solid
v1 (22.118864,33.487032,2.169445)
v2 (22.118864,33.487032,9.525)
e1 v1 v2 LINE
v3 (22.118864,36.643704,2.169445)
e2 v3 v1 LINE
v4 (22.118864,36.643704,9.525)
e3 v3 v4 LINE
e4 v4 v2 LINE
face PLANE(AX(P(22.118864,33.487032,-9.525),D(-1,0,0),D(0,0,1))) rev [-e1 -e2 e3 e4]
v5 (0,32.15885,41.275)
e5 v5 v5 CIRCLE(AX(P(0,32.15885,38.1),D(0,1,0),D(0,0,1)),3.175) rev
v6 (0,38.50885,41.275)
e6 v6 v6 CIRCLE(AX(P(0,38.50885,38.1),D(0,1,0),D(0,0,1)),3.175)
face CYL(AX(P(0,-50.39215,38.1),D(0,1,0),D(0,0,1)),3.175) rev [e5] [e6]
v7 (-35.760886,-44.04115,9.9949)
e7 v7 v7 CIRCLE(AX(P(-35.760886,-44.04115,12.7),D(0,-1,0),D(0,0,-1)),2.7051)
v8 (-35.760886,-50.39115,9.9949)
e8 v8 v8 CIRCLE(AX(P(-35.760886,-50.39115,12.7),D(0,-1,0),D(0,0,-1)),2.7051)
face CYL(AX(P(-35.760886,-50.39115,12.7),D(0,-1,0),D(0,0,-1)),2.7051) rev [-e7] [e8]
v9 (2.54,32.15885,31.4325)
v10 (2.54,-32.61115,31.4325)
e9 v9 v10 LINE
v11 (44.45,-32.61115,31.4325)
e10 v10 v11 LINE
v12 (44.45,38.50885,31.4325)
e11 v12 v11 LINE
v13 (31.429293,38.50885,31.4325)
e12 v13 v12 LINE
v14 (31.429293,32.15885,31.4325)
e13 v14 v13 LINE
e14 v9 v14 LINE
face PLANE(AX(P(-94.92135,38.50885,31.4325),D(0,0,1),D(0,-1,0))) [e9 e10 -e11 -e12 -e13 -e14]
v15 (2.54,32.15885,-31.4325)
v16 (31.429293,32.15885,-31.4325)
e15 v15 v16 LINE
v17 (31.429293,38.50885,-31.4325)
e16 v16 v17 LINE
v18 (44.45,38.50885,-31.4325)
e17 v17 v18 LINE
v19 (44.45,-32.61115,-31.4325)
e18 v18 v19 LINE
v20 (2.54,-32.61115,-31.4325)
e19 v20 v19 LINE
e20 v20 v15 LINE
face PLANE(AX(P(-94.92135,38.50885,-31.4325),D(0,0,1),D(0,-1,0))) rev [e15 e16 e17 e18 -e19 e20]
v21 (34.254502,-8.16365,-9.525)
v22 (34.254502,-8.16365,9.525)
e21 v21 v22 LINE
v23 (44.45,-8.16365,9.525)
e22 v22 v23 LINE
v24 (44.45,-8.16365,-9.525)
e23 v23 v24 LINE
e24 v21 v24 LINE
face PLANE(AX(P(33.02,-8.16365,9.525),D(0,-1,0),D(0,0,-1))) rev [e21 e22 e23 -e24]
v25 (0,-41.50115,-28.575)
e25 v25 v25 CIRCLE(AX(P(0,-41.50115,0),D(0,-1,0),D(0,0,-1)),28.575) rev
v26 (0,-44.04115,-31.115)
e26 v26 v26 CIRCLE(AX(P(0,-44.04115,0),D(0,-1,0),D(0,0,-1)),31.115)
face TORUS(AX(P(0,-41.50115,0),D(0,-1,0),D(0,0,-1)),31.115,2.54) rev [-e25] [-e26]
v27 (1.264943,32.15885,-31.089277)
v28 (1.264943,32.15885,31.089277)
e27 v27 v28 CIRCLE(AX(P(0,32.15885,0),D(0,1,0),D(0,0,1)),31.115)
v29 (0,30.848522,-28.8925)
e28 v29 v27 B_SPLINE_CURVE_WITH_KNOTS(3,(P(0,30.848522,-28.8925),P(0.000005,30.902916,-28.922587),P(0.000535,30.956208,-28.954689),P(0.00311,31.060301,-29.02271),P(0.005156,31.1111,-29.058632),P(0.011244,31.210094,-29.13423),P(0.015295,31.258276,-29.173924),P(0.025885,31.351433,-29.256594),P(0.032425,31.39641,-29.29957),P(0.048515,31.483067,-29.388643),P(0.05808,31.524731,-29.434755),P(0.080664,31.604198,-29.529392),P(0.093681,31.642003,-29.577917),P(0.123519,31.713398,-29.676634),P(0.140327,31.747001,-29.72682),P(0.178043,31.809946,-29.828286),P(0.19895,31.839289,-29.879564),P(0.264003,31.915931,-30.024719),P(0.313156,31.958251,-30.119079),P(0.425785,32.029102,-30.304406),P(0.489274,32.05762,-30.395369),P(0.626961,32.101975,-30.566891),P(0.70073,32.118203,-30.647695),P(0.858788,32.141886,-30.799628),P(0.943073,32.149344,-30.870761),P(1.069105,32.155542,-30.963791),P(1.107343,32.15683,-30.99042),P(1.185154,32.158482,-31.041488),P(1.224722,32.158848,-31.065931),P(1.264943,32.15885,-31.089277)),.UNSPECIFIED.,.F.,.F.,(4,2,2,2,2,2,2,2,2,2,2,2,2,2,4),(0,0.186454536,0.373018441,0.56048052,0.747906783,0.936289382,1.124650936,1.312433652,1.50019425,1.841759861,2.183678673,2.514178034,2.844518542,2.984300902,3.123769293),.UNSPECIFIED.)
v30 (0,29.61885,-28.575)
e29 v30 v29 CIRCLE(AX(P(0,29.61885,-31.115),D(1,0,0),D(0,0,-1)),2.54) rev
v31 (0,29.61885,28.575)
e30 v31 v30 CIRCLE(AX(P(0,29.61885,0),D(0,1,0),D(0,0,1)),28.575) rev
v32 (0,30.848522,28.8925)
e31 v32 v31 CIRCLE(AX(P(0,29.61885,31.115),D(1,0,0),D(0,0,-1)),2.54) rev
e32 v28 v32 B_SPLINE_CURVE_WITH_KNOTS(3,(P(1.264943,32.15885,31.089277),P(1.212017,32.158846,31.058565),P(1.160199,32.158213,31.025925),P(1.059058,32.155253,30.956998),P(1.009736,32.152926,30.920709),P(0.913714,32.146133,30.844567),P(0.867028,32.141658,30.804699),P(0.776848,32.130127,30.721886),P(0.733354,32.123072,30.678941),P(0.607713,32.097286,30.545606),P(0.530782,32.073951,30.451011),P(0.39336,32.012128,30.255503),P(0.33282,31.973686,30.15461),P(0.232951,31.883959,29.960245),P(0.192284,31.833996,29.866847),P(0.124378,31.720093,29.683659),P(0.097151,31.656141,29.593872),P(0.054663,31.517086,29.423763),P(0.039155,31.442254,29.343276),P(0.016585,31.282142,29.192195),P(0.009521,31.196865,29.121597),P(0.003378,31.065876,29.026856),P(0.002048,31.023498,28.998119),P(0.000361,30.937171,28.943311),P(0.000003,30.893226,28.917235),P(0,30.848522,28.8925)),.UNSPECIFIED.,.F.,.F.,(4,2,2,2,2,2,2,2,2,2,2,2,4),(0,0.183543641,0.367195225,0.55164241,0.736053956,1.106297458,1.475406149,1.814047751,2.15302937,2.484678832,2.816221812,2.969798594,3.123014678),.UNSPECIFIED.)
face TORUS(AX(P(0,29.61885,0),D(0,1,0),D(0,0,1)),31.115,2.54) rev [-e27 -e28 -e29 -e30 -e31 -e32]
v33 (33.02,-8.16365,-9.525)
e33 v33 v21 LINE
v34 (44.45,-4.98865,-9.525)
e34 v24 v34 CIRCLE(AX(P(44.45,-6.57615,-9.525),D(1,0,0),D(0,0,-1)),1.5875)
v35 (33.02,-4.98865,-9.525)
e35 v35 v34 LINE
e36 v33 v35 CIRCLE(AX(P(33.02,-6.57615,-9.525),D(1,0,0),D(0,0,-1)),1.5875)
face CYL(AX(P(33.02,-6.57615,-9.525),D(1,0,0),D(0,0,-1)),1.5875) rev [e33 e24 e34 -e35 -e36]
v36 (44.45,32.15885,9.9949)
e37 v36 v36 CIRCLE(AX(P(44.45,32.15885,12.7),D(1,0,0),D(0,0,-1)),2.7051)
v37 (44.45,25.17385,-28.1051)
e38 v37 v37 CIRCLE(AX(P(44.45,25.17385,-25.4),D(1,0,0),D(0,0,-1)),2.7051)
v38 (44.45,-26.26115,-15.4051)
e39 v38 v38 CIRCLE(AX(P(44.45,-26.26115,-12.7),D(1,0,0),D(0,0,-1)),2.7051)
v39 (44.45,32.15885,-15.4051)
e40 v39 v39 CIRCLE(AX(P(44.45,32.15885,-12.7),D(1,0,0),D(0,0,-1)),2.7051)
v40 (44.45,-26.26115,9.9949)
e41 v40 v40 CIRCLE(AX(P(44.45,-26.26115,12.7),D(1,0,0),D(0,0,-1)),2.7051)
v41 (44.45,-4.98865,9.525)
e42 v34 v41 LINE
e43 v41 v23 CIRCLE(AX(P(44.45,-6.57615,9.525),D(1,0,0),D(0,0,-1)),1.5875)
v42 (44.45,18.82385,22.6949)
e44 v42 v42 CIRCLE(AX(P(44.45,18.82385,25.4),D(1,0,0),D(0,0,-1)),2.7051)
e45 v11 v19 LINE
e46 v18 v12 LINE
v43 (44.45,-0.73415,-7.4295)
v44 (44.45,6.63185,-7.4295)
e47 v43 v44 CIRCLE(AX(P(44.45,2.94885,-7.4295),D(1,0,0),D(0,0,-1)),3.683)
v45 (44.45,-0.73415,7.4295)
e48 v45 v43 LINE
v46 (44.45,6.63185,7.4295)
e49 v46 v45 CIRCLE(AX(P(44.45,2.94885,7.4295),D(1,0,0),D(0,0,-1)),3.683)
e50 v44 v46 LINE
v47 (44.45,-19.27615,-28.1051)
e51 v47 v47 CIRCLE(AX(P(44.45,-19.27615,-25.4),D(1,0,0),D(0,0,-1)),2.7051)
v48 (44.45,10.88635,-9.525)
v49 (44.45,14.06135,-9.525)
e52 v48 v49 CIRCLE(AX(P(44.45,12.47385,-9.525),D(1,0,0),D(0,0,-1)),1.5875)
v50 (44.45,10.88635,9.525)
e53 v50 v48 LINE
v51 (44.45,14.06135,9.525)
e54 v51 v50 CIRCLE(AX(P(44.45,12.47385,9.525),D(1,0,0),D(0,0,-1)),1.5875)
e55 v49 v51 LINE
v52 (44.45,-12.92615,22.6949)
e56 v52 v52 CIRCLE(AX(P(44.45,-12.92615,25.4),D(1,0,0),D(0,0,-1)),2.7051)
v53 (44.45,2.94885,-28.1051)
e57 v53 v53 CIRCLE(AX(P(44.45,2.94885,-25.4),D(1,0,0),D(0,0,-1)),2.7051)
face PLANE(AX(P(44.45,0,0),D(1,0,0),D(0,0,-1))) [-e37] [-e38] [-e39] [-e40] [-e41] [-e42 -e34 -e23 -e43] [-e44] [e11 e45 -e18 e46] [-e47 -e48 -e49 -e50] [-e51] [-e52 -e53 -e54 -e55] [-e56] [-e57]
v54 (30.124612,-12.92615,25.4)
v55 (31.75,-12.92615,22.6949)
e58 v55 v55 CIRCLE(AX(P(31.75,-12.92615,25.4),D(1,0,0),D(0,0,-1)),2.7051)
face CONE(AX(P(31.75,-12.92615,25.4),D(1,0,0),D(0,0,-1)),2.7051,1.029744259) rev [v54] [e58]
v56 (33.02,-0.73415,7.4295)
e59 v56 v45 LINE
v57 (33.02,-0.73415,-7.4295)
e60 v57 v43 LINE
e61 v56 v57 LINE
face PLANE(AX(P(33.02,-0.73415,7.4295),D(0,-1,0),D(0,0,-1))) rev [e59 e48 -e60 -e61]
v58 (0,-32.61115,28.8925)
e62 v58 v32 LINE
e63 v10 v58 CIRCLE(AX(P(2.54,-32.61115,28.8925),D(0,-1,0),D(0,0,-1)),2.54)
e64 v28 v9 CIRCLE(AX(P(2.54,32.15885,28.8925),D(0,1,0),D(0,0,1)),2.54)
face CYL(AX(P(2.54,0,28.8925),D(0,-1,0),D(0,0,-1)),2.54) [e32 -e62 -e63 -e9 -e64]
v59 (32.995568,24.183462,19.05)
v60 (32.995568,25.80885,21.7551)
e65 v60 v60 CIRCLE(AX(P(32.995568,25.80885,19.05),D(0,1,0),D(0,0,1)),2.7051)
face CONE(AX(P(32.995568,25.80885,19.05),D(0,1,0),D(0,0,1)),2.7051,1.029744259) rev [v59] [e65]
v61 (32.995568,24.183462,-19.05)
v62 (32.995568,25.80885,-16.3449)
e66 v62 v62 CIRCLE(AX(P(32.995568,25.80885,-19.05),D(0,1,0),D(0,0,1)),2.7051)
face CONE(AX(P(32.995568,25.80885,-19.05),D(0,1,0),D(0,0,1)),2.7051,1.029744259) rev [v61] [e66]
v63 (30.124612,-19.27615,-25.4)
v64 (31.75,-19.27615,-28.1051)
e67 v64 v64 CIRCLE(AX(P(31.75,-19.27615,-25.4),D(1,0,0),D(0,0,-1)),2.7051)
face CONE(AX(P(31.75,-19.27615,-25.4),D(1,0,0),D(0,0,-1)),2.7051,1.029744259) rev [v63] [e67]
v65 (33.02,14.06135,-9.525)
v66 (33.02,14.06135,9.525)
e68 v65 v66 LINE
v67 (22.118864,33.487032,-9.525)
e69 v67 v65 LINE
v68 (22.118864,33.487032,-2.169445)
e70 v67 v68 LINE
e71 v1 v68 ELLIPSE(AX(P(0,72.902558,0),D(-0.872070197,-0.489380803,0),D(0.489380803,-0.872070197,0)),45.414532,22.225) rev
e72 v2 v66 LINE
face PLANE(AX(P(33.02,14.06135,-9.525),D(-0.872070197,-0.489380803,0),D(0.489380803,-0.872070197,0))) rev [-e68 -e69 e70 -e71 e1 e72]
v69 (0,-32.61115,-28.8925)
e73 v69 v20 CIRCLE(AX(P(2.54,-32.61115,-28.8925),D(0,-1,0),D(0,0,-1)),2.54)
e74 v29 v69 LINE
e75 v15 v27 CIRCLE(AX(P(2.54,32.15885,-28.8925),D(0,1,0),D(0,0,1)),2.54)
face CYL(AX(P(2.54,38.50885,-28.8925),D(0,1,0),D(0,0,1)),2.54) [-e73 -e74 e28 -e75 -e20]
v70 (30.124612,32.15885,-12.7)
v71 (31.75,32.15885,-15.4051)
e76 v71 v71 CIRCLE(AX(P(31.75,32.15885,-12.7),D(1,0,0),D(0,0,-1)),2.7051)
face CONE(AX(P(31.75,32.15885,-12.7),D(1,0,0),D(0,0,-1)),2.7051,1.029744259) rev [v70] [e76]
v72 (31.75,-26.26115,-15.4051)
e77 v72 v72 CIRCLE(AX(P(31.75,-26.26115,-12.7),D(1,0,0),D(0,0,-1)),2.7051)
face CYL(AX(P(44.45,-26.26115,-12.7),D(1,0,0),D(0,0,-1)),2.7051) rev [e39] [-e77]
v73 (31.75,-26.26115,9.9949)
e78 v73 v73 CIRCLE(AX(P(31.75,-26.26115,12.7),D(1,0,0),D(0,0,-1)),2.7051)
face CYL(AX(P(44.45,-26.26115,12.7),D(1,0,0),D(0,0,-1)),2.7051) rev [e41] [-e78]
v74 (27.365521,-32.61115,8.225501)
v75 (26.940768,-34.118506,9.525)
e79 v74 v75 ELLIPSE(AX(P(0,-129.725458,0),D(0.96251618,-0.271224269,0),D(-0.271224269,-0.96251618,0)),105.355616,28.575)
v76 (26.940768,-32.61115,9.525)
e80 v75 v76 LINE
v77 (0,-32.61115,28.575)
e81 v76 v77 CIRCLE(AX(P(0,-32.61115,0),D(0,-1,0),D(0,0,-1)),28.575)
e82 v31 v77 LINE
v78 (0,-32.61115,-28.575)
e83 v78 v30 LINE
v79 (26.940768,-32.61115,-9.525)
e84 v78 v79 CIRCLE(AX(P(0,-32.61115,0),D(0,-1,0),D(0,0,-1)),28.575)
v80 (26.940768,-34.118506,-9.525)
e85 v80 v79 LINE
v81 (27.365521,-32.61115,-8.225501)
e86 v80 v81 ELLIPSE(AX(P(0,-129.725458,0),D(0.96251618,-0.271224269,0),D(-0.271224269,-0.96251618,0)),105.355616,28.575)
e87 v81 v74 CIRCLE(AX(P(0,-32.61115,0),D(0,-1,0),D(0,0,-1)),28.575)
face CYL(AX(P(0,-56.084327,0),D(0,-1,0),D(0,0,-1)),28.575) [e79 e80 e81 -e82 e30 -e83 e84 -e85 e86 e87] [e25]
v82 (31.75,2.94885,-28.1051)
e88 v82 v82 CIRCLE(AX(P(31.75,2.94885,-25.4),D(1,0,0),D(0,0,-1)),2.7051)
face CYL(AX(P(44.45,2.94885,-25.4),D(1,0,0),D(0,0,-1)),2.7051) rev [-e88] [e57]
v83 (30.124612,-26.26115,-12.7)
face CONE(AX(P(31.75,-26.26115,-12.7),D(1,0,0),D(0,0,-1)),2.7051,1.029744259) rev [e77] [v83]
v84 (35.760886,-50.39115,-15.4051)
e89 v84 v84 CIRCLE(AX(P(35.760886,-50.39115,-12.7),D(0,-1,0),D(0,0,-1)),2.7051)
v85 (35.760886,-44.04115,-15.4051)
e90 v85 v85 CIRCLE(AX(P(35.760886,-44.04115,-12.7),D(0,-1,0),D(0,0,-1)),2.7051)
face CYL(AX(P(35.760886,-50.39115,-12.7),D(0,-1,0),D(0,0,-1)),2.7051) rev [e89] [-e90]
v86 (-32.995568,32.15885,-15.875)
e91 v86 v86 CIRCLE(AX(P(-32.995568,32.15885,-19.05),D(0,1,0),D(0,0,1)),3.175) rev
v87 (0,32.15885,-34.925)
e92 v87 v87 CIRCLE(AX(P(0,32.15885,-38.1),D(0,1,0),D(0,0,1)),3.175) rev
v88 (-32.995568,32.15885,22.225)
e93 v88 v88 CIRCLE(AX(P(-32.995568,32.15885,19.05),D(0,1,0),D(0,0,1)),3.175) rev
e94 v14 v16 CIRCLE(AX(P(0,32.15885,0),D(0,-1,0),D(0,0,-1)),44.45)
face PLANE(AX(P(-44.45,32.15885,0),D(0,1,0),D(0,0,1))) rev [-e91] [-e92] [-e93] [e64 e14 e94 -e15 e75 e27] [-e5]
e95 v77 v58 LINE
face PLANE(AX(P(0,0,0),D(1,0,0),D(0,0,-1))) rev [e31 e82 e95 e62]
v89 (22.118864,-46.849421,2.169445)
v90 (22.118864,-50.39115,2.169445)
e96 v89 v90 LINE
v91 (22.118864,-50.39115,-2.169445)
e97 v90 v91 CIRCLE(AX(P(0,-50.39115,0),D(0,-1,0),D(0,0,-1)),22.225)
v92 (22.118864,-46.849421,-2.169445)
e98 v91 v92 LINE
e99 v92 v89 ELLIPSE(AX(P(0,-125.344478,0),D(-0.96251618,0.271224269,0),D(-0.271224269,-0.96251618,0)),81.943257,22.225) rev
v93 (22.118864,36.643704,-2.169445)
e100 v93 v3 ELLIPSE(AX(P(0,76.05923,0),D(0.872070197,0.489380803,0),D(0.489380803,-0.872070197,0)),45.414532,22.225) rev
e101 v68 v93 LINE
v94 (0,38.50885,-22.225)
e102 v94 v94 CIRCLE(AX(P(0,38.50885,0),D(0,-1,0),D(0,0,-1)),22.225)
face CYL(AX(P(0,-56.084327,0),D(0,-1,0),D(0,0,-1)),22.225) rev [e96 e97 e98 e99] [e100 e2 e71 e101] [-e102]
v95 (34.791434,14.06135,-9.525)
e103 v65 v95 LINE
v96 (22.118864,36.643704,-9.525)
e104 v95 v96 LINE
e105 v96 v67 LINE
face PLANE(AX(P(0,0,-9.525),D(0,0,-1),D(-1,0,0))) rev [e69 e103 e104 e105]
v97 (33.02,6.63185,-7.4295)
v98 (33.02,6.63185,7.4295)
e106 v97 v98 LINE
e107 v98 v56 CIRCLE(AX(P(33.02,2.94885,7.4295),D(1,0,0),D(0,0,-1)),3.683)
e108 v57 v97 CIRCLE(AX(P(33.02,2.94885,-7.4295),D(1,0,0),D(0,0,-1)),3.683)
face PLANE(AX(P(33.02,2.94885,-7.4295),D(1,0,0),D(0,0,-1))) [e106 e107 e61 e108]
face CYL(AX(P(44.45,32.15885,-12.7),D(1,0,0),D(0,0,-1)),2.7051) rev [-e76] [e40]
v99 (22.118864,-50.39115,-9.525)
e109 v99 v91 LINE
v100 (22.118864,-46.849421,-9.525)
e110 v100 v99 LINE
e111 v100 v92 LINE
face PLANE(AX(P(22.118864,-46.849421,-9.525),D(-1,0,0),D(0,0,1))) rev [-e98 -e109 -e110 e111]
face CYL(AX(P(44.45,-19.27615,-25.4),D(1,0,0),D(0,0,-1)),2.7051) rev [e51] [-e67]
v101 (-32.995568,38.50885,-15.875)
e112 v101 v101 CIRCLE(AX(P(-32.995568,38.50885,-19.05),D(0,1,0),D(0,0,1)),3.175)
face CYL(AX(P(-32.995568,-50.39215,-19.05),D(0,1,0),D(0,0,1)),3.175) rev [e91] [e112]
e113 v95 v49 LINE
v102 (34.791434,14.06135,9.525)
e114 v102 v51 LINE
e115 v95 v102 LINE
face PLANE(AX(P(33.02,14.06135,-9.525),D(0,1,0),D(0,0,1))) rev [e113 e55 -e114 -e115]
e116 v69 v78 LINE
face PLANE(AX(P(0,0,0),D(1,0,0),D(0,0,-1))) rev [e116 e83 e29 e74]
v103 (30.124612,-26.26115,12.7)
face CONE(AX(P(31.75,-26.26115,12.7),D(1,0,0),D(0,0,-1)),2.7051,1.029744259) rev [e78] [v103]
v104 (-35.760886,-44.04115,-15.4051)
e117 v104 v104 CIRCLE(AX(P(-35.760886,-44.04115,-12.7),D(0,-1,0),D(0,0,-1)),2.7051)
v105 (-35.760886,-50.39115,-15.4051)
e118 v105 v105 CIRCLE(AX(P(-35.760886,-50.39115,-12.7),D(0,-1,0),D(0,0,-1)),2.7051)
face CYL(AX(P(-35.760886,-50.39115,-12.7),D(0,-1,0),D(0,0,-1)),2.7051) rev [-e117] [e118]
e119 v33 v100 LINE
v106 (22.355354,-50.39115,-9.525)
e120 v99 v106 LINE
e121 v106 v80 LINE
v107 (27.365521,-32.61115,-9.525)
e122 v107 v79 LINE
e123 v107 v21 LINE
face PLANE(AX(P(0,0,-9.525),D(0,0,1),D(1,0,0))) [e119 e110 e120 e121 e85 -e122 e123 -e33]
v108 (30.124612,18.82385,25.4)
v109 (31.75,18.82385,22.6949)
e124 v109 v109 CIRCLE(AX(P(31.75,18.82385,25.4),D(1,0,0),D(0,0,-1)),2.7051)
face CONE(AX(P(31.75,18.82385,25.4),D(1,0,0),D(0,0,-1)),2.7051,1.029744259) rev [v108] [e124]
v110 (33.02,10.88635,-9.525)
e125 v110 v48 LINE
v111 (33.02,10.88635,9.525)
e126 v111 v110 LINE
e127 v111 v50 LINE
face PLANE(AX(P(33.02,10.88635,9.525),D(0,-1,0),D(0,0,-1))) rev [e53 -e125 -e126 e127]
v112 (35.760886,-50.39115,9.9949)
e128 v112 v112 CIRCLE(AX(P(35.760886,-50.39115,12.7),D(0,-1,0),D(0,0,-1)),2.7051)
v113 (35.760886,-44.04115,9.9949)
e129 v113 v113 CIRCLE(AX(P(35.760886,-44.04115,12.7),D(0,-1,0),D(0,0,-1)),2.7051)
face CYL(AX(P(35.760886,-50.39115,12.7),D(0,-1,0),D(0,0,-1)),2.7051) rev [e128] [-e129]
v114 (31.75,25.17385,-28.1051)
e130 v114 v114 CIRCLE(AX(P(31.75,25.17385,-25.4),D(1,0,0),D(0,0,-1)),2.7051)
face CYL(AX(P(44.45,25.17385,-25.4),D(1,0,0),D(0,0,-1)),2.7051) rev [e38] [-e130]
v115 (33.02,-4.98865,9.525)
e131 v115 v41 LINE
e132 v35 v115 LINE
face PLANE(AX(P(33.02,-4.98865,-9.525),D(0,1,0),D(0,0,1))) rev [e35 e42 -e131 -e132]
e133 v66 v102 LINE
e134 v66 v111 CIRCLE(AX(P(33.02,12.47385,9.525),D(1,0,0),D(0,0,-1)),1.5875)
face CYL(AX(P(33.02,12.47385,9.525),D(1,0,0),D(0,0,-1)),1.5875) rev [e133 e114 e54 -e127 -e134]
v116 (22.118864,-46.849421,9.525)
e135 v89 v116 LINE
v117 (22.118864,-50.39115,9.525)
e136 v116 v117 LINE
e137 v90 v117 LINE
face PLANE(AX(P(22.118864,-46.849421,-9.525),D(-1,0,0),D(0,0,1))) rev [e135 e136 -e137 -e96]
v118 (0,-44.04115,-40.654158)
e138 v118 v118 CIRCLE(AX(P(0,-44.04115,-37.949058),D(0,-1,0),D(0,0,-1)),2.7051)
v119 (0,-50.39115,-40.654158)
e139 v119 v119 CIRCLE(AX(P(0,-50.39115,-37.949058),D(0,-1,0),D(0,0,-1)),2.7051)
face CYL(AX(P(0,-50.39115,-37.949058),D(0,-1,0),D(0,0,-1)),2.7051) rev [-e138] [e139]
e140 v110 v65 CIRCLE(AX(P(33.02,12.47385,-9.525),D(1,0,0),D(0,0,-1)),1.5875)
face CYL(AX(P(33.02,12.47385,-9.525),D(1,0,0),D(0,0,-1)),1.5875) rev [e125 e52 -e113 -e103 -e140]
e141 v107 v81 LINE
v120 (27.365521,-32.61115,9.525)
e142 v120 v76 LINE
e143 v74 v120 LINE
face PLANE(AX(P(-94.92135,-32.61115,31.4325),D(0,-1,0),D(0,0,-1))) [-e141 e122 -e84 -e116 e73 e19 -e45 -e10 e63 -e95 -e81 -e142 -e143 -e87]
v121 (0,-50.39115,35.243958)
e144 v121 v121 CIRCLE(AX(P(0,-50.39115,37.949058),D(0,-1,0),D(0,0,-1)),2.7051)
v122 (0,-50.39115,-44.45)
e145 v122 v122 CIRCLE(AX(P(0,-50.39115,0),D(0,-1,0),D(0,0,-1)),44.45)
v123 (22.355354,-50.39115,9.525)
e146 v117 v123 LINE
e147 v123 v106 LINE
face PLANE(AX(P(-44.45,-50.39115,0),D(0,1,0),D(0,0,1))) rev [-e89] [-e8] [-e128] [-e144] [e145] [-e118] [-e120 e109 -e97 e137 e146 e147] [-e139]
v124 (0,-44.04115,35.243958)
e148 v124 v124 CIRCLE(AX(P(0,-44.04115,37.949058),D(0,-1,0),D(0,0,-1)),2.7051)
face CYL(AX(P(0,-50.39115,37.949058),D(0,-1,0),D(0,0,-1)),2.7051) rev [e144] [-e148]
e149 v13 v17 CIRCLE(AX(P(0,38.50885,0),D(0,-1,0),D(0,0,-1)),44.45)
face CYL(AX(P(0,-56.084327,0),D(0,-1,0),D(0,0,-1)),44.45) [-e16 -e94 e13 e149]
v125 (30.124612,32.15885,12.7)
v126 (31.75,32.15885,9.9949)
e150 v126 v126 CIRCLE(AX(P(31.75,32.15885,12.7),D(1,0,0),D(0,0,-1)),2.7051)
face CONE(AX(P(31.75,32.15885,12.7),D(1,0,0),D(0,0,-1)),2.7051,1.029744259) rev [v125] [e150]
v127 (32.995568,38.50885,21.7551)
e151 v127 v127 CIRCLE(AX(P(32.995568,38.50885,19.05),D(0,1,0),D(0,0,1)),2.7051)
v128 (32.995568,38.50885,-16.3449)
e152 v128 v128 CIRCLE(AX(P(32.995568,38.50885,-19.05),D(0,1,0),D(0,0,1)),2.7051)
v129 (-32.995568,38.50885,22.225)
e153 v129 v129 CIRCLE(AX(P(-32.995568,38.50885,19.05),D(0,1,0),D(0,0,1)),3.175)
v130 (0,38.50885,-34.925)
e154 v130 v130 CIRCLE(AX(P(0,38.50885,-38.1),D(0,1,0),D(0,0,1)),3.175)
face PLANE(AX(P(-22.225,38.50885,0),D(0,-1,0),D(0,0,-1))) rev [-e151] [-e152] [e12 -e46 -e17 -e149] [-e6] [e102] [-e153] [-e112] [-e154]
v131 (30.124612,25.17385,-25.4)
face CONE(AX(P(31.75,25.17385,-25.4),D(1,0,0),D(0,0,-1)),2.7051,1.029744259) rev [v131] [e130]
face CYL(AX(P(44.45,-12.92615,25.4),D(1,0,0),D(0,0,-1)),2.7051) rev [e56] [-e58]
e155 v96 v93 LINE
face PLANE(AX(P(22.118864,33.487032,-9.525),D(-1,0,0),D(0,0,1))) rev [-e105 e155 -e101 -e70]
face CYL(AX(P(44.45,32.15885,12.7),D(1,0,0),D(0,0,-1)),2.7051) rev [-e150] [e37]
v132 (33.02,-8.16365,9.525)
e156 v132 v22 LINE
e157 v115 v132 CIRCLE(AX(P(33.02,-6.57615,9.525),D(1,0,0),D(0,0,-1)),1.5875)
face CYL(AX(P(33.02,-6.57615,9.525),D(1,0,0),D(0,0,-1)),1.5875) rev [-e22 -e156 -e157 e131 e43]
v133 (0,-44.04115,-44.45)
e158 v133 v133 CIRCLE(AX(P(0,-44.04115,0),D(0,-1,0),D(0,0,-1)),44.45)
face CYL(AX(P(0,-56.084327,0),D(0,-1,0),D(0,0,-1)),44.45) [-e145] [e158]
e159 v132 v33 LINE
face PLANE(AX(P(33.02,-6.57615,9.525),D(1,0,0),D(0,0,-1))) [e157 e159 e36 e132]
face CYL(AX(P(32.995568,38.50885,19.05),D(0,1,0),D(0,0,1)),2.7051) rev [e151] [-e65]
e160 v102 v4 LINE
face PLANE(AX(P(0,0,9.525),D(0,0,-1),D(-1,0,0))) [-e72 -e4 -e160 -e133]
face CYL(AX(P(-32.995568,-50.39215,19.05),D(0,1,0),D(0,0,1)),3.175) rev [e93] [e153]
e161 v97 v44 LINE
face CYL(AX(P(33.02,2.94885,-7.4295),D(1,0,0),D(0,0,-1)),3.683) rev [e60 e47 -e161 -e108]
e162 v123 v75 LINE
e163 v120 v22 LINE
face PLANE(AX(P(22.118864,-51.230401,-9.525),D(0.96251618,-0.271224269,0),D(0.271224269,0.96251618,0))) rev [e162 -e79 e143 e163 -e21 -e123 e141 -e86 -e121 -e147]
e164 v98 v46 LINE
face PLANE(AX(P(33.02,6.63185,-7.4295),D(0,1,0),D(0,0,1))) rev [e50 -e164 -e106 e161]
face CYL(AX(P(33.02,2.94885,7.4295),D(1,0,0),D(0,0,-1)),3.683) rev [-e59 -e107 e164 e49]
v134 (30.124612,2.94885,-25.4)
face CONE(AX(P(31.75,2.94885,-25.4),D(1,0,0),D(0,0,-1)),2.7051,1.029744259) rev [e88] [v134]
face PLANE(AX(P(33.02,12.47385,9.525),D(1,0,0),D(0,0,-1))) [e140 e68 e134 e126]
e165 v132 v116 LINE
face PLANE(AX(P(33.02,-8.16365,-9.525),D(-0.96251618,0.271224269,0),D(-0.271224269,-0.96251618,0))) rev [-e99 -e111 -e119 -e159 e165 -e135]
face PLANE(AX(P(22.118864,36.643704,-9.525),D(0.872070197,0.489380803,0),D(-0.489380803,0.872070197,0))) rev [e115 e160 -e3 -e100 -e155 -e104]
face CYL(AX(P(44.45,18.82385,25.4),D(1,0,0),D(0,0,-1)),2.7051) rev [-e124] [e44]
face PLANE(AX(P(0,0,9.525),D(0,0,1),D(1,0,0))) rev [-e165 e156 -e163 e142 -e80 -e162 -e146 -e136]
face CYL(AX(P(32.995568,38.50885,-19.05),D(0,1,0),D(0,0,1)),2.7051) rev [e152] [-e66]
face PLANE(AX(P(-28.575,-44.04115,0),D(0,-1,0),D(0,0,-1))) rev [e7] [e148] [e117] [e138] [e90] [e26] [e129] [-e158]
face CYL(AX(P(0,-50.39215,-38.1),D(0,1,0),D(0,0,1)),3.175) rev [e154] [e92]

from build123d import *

# Parameters (mm, degrees)
CUT_EXTRUDE1_REACH          = 110.88
SKETCH5_R                   = 3.175
SKETCH3_W                   = 62.865
SKETCH3_H                   = 71.12
BOSS_EXTRUDE3_DEPTH         = 44.45
SKETCH8_R                   = 22.225
CUT_EXTRUDE3_DEPTH          = 109.879819067
FILLET1_R                   = 2.54
FILLET2_R                   = 2.54
F_1_4_28_TAPPED_HOLE1_D     = 5.4102
F_1_4_28_TAPPED_HOLE1_DEPTH = 12.7
F_1_4_28_TAPPED_HOLE1_TIP   = 1.625388061
F_1_4_28_TAPPED_HOLE7_D     = 5.4102
F_1_4_28_TAPPED_HOLE7_DEPTH = 6.35
F_1_4_28_TAPPED_HOLE8_D     = 5.4102
F_1_4_28_TAPPED_HOLE8_DEPTH = 12.7
F_1_4_28_TAPPED_HOLE8_TIP   = 1.625388061
CUT_EXTRUDE4_DEPTH          = 11.43
CUT_EXTRUDE6_DEPTH          = 9.525
CUT_EXTRUDE6_DEPTH_BACK     = 9.525
F_1_4_28_TAPPED_HOLE9_D     = 5.4102
F_1_4_28_TAPPED_HOLE9_DEPTH = 12.7
F_1_4_28_TAPPED_HOLE9_TIP   = 1.625388061


with BuildPart() as part:
    # Sketch2 → Revolve1 (revolve)
    with BuildSketch(Plane.XY, mode=Mode.PRIVATE) as revolve1_sk:
        Polygon((-22.225, 38.508849789), (-44.45, 38.508849789), (-44.45, 32.158849789), (-28.575, 32.158849789), (-28.575, -44.041150211), (-44.45, -44.041150211), (-44.45, -50.391150211), (-22.225, -50.391150211), (-22.225, 26.465672677), align=None)
    revolve(revolve1_sk.sketch.rotate(Axis((0, -56.084327323, 0), (0, 1, 0)), 270), axis=Axis((0, -56.084327323, 0), (0, 1, 0)))

    # Sketch5 → Cut-Extrude1 (cut, up to next)
    with BuildSketch(Plane(origin=(0, 38.508849789, 0), x_dir=(1, 0, 0), z_dir=(0, 1, 0)), mode=Mode.PRIVATE) as cut_extrude1_sk1:
        with Locations(Location((0, 38.1, 0), (0, 0, 270))):
            Circle(SKETCH5_R)
    cut_extrude1_tool1 = extrude(cut_extrude1_sk1.sketch, amount=-CUT_EXTRUDE1_REACH, mode=Mode.PRIVATE) & part.part
    # Sketch5 → Cut-Extrude1 (cut, up to next)
    with BuildSketch(Plane(origin=(0, 38.508849789, 0), x_dir=(1, 0, 0), z_dir=(0, 1, 0)), mode=Mode.PRIVATE) as cut_extrude1_sk2:
        with Locations(Location((32.995567884, 19.05, 0), (0, 0, 270))):
            Circle(SKETCH5_R)
    cut_extrude1_tool2 = extrude(cut_extrude1_sk2.sketch, amount=-CUT_EXTRUDE1_REACH, mode=Mode.PRIVATE) & part.part
    # Sketch5 → Cut-Extrude1 (cut, up to next)
    with BuildSketch(Plane(origin=(0, 38.508849789, 0), x_dir=(1, 0, 0), z_dir=(0, 1, 0)), mode=Mode.PRIVATE) as cut_extrude1_sk3:
        with Locations(Location((32.995567884, -19.05, 0), (0, 0, 270))):
            Circle(SKETCH5_R)
    cut_extrude1_tool3 = extrude(cut_extrude1_sk3.sketch, amount=-CUT_EXTRUDE1_REACH, mode=Mode.PRIVATE) & part.part
    # Sketch5 → Cut-Extrude1 (cut, up to next)
    with BuildSketch(Plane(origin=(0, 38.508849789, 0), x_dir=(1, 0, 0), z_dir=(0, 1, 0)), mode=Mode.PRIVATE) as cut_extrude1_sk4:
        with Locations(Location((0, -38.1, 0), (0, 0, 270))):
            Circle(SKETCH5_R)
    cut_extrude1_tool4 = extrude(cut_extrude1_sk4.sketch, amount=-CUT_EXTRUDE1_REACH, mode=Mode.PRIVATE) & part.part
    # Sketch5 → Cut-Extrude1 (cut, up to next)
    with BuildSketch(Plane(origin=(0, 38.508849789, 0), x_dir=(1, 0, 0), z_dir=(0, 1, 0)), mode=Mode.PRIVATE) as cut_extrude1_sk5:
        with Locations(Location((-32.995567884, -19.05, 0), (0, 0, 270))):
            Circle(SKETCH5_R)
    cut_extrude1_tool5 = extrude(cut_extrude1_sk5.sketch, amount=-CUT_EXTRUDE1_REACH, mode=Mode.PRIVATE) & part.part
    # Sketch5 → Cut-Extrude1 (cut, up to next)
    with BuildSketch(Plane(origin=(0, 38.508849789, 0), x_dir=(1, 0, 0), z_dir=(0, 1, 0)), mode=Mode.PRIVATE) as cut_extrude1_sk6:
        with Locations(Location((-32.995567884, 19.05, 0), (0, 0, 270))):
            Circle(SKETCH5_R)
    cut_extrude1_tool6 = extrude(cut_extrude1_sk6.sketch, amount=-CUT_EXTRUDE1_REACH, mode=Mode.PRIVATE) & part.part
    add(cut_extrude1_tool1.solids().sort_by_distance((0, 38.50885, -38.1))[0], mode=Mode.SUBTRACT)
    add(cut_extrude1_tool2.solids().sort_by_distance((32.995568, 38.50885, -19.05))[0], mode=Mode.SUBTRACT)
    add(cut_extrude1_tool3.solids().sort_by_distance((32.995568, 38.50885, 19.05))[0], mode=Mode.SUBTRACT)
    add(cut_extrude1_tool4.solids().sort_by_distance((0, 38.50885, 38.1))[0], mode=Mode.SUBTRACT)
    add(cut_extrude1_tool5.solids().sort_by_distance((-32.995568, 38.50885, 19.05))[0], mode=Mode.SUBTRACT)
    add(cut_extrude1_tool6.solids().sort_by_distance((-32.995568, 38.50885, -19.05))[0], mode=Mode.SUBTRACT)

    # Sketch3 → Boss-Extrude3 (add)
    with BuildSketch(Plane(origin=(44.45, 0, 0), x_dir=(0, 0, -1), z_dir=(1, 0, 0))):
        with Locations((0, 2.948849789)):
            Rectangle(SKETCH3_W, SKETCH3_H)
    extrude(amount=-BOSS_EXTRUDE3_DEPTH)

    # Sketch8 → Cut-Extrude3 (cut, through all)
    with BuildSketch(Plane(origin=(0, 38.508849789, 0), x_dir=(1, 0, 0), z_dir=(0, 1, 0))):
        with Locations(Location((0, 0, 0), (0, 0, 90))):
            Circle(SKETCH8_R)
    extrude(amount=-CUT_EXTRUDE3_DEPTH, mode=Mode.SUBTRACT)

    # Fillet1
    fillet1_edges = [part.edges().sort_by_distance(p)[0] for p in [
        (0, -0.226150211, -31.4325),
        (0, -0.226150211, 31.4325),
    ]]
    fillet(fillet1_edges, radius=FILLET1_R)

    # Fillet2
    # the kernel refuses this fillet: 2.54 mm, written as the material it adds along each edge
    with BuildSketch(Plane(origin=(0, 32.158849789, 0), x_dir=(0.22074631689702245, 0, -0.9753312583816841), z_dir=(0.9753312583816841, 0, 0.22074631689702245))) as fillet2_piece_1:
        with BuildLine():
            CenterArc((28.575 + FILLET2_R, -FILLET2_R), FILLET2_R, 90, 90)
            Line((28.575, -FILLET2_R), (28.575, 0))
            Line((28.575, 0), (28.575 + FILLET2_R, 0))
        make_face()
    revolve(axis=Axis((0, 32.158849789, 0), (0, 1, 0)), revolution_arc=205.505743093)
    with BuildSketch(Plane(origin=(0, -44.041150211, 0), x_dir=(0, 0, -1), z_dir=(1, 0, 0))) as fillet2_piece_2:
        with BuildLine():
            CenterArc((28.575 + FILLET2_R, FILLET2_R), FILLET2_R, 180, 90)
            Line((28.575 + FILLET2_R, 0), (28.575, 0))
            Line((28.575, 0), (28.575, FILLET2_R))
        make_face()
    revolve(axis=Axis((0, -44.041150211, 0), (0, 1, 0)))

    # 1/4-28 Tapped Hole1
    with Locations(Plane(origin=(44.45, 32.158849789, 12.7), x_dir=(0, 0, 1), z_dir=(1, 0, 0))):
        with Locations((0, 0), (-25.4, 0), (-38.1, 6.985), (-38.1, 29.21), (-38.1, 51.435), (-25.4, 58.42), (0, 58.42)):
            Hole(F_1_4_28_TAPPED_HOLE1_D / 2, depth=F_1_4_28_TAPPED_HOLE1_DEPTH)
            with Locations((0, 0, -(F_1_4_28_TAPPED_HOLE1_DEPTH + F_1_4_28_TAPPED_HOLE1_TIP / 2))):  # 118° drill point
                Cone(0, F_1_4_28_TAPPED_HOLE1_D / 2, F_1_4_28_TAPPED_HOLE1_TIP, mode=Mode.SUBTRACT)

    # 1/4-28 Tapped Hole7
    with Locations(Plane(origin=(0, -50.391150211, -37.949057556), x_dir=(0, 0, -1), z_dir=(0, -1, 0))):
        with Locations((0, 0), (-25.249057556, 35.760886026), (-50.649057556, 35.760886026), (-25.249057556, -35.760886026), (-50.649057556, -35.760886026), (-75.898115112, 0)):
            Hole(F_1_4_28_TAPPED_HOLE7_D / 2, depth=F_1_4_28_TAPPED_HOLE7_DEPTH)

    # 1/4-28 Tapped Hole8
    with Locations(Plane(origin=(32.995567884, 38.508849789, -19.05), x_dir=(0, 0, 1), z_dir=(0, 1, 0))):
        with Locations((0, 0), (38.1, 0)):
            Hole(F_1_4_28_TAPPED_HOLE8_D / 2, depth=F_1_4_28_TAPPED_HOLE8_DEPTH)
            with Locations((0, 0, -(F_1_4_28_TAPPED_HOLE8_DEPTH + F_1_4_28_TAPPED_HOLE8_TIP / 2))):  # 118° drill point
                Cone(0, F_1_4_28_TAPPED_HOLE8_D / 2, F_1_4_28_TAPPED_HOLE8_TIP, mode=Mode.SUBTRACT)

    # Sketch13 → Cut-Extrude4 (cut)
    with BuildSketch(Plane(origin=(44.45, 0, 0), x_dir=(0, 0, -1), z_dir=(1, 0, 0))):
        with BuildLine():
            Line((9.525, 14.061349789), (-9.525, 14.061349789))
            ThreePointArc((-9.525, 14.061349789), (-11.1125, 12.473849789), (-9.525, 10.886349789))
            Line((-9.525, 10.886349789), (9.525, 10.886349789))
            ThreePointArc((9.525, 10.886349789), (11.1125, 12.473849789), (9.525, 14.061349789))
        make_face()
        with BuildLine():
            Line((7.4295, 6.631849789), (-7.4295, 6.631849789))
            ThreePointArc((-7.4295, 6.631849789), (-11.1125, 2.948849789), (-7.4295, -0.734150211))
            Line((-7.4295, -0.734150211), (7.4295, -0.734150211))
            ThreePointArc((7.4295, -0.734150211), (11.1125, 2.948849789), (7.4295, 6.631849789))
        make_face()
        with BuildLine():
            Line((-9.525, -8.163650211), (9.525, -8.163650211))
            ThreePointArc((9.525, -8.163650211), (11.1125, -6.576150211), (9.525, -4.988650211))
            Line((9.525, -4.988650211), (-9.525, -4.988650211))
            ThreePointArc((-9.525, -4.988650211), (-11.1125, -6.576150211), (-9.525, -8.163650211))
        make_face()
    extrude(amount=-CUT_EXTRUDE4_DEPTH, mode=Mode.SUBTRACT)

    # Sketch22 → Cut-Extrude6 (cut, two sides: drawn at the far end of the back side and taken through both)
    with BuildSketch(Plane.XY.offset(-CUT_EXTRUDE6_DEPTH_BACK)):
        Polygon((33.02, 14.061349789), (22.118863764, 33.487032124), (22.118863764, 36.643703979), (34.791433783, 14.061349789), align=None)
        Polygon((33.02, -8.163650211), (22.118863764, -46.84942144), (22.118863764, -51.230401207), (34.25450188, -8.163650211), align=None)
    extrude(amount=CUT_EXTRUDE6_DEPTH + CUT_EXTRUDE6_DEPTH_BACK, mode=Mode.SUBTRACT)

    # 1/4-28 Tapped Hole9
    with Locations(Plane(origin=(44.45, -12.926150211, 25.4), x_dir=(0, 0, 1), z_dir=(1, 0, 0))):
        with Locations((0, 0), (0, -31.75)):
            Hole(F_1_4_28_TAPPED_HOLE9_D / 2, depth=F_1_4_28_TAPPED_HOLE9_DEPTH)
            with Locations((0, 0, -(F_1_4_28_TAPPED_HOLE9_DEPTH + F_1_4_28_TAPPED_HOLE9_TIP / 2))):  # 118° drill point
                Cone(0, F_1_4_28_TAPPED_HOLE9_D / 2, F_1_4_28_TAPPED_HOLE9_TIP, mode=Mode.SUBTRACT)


solid = part.part
